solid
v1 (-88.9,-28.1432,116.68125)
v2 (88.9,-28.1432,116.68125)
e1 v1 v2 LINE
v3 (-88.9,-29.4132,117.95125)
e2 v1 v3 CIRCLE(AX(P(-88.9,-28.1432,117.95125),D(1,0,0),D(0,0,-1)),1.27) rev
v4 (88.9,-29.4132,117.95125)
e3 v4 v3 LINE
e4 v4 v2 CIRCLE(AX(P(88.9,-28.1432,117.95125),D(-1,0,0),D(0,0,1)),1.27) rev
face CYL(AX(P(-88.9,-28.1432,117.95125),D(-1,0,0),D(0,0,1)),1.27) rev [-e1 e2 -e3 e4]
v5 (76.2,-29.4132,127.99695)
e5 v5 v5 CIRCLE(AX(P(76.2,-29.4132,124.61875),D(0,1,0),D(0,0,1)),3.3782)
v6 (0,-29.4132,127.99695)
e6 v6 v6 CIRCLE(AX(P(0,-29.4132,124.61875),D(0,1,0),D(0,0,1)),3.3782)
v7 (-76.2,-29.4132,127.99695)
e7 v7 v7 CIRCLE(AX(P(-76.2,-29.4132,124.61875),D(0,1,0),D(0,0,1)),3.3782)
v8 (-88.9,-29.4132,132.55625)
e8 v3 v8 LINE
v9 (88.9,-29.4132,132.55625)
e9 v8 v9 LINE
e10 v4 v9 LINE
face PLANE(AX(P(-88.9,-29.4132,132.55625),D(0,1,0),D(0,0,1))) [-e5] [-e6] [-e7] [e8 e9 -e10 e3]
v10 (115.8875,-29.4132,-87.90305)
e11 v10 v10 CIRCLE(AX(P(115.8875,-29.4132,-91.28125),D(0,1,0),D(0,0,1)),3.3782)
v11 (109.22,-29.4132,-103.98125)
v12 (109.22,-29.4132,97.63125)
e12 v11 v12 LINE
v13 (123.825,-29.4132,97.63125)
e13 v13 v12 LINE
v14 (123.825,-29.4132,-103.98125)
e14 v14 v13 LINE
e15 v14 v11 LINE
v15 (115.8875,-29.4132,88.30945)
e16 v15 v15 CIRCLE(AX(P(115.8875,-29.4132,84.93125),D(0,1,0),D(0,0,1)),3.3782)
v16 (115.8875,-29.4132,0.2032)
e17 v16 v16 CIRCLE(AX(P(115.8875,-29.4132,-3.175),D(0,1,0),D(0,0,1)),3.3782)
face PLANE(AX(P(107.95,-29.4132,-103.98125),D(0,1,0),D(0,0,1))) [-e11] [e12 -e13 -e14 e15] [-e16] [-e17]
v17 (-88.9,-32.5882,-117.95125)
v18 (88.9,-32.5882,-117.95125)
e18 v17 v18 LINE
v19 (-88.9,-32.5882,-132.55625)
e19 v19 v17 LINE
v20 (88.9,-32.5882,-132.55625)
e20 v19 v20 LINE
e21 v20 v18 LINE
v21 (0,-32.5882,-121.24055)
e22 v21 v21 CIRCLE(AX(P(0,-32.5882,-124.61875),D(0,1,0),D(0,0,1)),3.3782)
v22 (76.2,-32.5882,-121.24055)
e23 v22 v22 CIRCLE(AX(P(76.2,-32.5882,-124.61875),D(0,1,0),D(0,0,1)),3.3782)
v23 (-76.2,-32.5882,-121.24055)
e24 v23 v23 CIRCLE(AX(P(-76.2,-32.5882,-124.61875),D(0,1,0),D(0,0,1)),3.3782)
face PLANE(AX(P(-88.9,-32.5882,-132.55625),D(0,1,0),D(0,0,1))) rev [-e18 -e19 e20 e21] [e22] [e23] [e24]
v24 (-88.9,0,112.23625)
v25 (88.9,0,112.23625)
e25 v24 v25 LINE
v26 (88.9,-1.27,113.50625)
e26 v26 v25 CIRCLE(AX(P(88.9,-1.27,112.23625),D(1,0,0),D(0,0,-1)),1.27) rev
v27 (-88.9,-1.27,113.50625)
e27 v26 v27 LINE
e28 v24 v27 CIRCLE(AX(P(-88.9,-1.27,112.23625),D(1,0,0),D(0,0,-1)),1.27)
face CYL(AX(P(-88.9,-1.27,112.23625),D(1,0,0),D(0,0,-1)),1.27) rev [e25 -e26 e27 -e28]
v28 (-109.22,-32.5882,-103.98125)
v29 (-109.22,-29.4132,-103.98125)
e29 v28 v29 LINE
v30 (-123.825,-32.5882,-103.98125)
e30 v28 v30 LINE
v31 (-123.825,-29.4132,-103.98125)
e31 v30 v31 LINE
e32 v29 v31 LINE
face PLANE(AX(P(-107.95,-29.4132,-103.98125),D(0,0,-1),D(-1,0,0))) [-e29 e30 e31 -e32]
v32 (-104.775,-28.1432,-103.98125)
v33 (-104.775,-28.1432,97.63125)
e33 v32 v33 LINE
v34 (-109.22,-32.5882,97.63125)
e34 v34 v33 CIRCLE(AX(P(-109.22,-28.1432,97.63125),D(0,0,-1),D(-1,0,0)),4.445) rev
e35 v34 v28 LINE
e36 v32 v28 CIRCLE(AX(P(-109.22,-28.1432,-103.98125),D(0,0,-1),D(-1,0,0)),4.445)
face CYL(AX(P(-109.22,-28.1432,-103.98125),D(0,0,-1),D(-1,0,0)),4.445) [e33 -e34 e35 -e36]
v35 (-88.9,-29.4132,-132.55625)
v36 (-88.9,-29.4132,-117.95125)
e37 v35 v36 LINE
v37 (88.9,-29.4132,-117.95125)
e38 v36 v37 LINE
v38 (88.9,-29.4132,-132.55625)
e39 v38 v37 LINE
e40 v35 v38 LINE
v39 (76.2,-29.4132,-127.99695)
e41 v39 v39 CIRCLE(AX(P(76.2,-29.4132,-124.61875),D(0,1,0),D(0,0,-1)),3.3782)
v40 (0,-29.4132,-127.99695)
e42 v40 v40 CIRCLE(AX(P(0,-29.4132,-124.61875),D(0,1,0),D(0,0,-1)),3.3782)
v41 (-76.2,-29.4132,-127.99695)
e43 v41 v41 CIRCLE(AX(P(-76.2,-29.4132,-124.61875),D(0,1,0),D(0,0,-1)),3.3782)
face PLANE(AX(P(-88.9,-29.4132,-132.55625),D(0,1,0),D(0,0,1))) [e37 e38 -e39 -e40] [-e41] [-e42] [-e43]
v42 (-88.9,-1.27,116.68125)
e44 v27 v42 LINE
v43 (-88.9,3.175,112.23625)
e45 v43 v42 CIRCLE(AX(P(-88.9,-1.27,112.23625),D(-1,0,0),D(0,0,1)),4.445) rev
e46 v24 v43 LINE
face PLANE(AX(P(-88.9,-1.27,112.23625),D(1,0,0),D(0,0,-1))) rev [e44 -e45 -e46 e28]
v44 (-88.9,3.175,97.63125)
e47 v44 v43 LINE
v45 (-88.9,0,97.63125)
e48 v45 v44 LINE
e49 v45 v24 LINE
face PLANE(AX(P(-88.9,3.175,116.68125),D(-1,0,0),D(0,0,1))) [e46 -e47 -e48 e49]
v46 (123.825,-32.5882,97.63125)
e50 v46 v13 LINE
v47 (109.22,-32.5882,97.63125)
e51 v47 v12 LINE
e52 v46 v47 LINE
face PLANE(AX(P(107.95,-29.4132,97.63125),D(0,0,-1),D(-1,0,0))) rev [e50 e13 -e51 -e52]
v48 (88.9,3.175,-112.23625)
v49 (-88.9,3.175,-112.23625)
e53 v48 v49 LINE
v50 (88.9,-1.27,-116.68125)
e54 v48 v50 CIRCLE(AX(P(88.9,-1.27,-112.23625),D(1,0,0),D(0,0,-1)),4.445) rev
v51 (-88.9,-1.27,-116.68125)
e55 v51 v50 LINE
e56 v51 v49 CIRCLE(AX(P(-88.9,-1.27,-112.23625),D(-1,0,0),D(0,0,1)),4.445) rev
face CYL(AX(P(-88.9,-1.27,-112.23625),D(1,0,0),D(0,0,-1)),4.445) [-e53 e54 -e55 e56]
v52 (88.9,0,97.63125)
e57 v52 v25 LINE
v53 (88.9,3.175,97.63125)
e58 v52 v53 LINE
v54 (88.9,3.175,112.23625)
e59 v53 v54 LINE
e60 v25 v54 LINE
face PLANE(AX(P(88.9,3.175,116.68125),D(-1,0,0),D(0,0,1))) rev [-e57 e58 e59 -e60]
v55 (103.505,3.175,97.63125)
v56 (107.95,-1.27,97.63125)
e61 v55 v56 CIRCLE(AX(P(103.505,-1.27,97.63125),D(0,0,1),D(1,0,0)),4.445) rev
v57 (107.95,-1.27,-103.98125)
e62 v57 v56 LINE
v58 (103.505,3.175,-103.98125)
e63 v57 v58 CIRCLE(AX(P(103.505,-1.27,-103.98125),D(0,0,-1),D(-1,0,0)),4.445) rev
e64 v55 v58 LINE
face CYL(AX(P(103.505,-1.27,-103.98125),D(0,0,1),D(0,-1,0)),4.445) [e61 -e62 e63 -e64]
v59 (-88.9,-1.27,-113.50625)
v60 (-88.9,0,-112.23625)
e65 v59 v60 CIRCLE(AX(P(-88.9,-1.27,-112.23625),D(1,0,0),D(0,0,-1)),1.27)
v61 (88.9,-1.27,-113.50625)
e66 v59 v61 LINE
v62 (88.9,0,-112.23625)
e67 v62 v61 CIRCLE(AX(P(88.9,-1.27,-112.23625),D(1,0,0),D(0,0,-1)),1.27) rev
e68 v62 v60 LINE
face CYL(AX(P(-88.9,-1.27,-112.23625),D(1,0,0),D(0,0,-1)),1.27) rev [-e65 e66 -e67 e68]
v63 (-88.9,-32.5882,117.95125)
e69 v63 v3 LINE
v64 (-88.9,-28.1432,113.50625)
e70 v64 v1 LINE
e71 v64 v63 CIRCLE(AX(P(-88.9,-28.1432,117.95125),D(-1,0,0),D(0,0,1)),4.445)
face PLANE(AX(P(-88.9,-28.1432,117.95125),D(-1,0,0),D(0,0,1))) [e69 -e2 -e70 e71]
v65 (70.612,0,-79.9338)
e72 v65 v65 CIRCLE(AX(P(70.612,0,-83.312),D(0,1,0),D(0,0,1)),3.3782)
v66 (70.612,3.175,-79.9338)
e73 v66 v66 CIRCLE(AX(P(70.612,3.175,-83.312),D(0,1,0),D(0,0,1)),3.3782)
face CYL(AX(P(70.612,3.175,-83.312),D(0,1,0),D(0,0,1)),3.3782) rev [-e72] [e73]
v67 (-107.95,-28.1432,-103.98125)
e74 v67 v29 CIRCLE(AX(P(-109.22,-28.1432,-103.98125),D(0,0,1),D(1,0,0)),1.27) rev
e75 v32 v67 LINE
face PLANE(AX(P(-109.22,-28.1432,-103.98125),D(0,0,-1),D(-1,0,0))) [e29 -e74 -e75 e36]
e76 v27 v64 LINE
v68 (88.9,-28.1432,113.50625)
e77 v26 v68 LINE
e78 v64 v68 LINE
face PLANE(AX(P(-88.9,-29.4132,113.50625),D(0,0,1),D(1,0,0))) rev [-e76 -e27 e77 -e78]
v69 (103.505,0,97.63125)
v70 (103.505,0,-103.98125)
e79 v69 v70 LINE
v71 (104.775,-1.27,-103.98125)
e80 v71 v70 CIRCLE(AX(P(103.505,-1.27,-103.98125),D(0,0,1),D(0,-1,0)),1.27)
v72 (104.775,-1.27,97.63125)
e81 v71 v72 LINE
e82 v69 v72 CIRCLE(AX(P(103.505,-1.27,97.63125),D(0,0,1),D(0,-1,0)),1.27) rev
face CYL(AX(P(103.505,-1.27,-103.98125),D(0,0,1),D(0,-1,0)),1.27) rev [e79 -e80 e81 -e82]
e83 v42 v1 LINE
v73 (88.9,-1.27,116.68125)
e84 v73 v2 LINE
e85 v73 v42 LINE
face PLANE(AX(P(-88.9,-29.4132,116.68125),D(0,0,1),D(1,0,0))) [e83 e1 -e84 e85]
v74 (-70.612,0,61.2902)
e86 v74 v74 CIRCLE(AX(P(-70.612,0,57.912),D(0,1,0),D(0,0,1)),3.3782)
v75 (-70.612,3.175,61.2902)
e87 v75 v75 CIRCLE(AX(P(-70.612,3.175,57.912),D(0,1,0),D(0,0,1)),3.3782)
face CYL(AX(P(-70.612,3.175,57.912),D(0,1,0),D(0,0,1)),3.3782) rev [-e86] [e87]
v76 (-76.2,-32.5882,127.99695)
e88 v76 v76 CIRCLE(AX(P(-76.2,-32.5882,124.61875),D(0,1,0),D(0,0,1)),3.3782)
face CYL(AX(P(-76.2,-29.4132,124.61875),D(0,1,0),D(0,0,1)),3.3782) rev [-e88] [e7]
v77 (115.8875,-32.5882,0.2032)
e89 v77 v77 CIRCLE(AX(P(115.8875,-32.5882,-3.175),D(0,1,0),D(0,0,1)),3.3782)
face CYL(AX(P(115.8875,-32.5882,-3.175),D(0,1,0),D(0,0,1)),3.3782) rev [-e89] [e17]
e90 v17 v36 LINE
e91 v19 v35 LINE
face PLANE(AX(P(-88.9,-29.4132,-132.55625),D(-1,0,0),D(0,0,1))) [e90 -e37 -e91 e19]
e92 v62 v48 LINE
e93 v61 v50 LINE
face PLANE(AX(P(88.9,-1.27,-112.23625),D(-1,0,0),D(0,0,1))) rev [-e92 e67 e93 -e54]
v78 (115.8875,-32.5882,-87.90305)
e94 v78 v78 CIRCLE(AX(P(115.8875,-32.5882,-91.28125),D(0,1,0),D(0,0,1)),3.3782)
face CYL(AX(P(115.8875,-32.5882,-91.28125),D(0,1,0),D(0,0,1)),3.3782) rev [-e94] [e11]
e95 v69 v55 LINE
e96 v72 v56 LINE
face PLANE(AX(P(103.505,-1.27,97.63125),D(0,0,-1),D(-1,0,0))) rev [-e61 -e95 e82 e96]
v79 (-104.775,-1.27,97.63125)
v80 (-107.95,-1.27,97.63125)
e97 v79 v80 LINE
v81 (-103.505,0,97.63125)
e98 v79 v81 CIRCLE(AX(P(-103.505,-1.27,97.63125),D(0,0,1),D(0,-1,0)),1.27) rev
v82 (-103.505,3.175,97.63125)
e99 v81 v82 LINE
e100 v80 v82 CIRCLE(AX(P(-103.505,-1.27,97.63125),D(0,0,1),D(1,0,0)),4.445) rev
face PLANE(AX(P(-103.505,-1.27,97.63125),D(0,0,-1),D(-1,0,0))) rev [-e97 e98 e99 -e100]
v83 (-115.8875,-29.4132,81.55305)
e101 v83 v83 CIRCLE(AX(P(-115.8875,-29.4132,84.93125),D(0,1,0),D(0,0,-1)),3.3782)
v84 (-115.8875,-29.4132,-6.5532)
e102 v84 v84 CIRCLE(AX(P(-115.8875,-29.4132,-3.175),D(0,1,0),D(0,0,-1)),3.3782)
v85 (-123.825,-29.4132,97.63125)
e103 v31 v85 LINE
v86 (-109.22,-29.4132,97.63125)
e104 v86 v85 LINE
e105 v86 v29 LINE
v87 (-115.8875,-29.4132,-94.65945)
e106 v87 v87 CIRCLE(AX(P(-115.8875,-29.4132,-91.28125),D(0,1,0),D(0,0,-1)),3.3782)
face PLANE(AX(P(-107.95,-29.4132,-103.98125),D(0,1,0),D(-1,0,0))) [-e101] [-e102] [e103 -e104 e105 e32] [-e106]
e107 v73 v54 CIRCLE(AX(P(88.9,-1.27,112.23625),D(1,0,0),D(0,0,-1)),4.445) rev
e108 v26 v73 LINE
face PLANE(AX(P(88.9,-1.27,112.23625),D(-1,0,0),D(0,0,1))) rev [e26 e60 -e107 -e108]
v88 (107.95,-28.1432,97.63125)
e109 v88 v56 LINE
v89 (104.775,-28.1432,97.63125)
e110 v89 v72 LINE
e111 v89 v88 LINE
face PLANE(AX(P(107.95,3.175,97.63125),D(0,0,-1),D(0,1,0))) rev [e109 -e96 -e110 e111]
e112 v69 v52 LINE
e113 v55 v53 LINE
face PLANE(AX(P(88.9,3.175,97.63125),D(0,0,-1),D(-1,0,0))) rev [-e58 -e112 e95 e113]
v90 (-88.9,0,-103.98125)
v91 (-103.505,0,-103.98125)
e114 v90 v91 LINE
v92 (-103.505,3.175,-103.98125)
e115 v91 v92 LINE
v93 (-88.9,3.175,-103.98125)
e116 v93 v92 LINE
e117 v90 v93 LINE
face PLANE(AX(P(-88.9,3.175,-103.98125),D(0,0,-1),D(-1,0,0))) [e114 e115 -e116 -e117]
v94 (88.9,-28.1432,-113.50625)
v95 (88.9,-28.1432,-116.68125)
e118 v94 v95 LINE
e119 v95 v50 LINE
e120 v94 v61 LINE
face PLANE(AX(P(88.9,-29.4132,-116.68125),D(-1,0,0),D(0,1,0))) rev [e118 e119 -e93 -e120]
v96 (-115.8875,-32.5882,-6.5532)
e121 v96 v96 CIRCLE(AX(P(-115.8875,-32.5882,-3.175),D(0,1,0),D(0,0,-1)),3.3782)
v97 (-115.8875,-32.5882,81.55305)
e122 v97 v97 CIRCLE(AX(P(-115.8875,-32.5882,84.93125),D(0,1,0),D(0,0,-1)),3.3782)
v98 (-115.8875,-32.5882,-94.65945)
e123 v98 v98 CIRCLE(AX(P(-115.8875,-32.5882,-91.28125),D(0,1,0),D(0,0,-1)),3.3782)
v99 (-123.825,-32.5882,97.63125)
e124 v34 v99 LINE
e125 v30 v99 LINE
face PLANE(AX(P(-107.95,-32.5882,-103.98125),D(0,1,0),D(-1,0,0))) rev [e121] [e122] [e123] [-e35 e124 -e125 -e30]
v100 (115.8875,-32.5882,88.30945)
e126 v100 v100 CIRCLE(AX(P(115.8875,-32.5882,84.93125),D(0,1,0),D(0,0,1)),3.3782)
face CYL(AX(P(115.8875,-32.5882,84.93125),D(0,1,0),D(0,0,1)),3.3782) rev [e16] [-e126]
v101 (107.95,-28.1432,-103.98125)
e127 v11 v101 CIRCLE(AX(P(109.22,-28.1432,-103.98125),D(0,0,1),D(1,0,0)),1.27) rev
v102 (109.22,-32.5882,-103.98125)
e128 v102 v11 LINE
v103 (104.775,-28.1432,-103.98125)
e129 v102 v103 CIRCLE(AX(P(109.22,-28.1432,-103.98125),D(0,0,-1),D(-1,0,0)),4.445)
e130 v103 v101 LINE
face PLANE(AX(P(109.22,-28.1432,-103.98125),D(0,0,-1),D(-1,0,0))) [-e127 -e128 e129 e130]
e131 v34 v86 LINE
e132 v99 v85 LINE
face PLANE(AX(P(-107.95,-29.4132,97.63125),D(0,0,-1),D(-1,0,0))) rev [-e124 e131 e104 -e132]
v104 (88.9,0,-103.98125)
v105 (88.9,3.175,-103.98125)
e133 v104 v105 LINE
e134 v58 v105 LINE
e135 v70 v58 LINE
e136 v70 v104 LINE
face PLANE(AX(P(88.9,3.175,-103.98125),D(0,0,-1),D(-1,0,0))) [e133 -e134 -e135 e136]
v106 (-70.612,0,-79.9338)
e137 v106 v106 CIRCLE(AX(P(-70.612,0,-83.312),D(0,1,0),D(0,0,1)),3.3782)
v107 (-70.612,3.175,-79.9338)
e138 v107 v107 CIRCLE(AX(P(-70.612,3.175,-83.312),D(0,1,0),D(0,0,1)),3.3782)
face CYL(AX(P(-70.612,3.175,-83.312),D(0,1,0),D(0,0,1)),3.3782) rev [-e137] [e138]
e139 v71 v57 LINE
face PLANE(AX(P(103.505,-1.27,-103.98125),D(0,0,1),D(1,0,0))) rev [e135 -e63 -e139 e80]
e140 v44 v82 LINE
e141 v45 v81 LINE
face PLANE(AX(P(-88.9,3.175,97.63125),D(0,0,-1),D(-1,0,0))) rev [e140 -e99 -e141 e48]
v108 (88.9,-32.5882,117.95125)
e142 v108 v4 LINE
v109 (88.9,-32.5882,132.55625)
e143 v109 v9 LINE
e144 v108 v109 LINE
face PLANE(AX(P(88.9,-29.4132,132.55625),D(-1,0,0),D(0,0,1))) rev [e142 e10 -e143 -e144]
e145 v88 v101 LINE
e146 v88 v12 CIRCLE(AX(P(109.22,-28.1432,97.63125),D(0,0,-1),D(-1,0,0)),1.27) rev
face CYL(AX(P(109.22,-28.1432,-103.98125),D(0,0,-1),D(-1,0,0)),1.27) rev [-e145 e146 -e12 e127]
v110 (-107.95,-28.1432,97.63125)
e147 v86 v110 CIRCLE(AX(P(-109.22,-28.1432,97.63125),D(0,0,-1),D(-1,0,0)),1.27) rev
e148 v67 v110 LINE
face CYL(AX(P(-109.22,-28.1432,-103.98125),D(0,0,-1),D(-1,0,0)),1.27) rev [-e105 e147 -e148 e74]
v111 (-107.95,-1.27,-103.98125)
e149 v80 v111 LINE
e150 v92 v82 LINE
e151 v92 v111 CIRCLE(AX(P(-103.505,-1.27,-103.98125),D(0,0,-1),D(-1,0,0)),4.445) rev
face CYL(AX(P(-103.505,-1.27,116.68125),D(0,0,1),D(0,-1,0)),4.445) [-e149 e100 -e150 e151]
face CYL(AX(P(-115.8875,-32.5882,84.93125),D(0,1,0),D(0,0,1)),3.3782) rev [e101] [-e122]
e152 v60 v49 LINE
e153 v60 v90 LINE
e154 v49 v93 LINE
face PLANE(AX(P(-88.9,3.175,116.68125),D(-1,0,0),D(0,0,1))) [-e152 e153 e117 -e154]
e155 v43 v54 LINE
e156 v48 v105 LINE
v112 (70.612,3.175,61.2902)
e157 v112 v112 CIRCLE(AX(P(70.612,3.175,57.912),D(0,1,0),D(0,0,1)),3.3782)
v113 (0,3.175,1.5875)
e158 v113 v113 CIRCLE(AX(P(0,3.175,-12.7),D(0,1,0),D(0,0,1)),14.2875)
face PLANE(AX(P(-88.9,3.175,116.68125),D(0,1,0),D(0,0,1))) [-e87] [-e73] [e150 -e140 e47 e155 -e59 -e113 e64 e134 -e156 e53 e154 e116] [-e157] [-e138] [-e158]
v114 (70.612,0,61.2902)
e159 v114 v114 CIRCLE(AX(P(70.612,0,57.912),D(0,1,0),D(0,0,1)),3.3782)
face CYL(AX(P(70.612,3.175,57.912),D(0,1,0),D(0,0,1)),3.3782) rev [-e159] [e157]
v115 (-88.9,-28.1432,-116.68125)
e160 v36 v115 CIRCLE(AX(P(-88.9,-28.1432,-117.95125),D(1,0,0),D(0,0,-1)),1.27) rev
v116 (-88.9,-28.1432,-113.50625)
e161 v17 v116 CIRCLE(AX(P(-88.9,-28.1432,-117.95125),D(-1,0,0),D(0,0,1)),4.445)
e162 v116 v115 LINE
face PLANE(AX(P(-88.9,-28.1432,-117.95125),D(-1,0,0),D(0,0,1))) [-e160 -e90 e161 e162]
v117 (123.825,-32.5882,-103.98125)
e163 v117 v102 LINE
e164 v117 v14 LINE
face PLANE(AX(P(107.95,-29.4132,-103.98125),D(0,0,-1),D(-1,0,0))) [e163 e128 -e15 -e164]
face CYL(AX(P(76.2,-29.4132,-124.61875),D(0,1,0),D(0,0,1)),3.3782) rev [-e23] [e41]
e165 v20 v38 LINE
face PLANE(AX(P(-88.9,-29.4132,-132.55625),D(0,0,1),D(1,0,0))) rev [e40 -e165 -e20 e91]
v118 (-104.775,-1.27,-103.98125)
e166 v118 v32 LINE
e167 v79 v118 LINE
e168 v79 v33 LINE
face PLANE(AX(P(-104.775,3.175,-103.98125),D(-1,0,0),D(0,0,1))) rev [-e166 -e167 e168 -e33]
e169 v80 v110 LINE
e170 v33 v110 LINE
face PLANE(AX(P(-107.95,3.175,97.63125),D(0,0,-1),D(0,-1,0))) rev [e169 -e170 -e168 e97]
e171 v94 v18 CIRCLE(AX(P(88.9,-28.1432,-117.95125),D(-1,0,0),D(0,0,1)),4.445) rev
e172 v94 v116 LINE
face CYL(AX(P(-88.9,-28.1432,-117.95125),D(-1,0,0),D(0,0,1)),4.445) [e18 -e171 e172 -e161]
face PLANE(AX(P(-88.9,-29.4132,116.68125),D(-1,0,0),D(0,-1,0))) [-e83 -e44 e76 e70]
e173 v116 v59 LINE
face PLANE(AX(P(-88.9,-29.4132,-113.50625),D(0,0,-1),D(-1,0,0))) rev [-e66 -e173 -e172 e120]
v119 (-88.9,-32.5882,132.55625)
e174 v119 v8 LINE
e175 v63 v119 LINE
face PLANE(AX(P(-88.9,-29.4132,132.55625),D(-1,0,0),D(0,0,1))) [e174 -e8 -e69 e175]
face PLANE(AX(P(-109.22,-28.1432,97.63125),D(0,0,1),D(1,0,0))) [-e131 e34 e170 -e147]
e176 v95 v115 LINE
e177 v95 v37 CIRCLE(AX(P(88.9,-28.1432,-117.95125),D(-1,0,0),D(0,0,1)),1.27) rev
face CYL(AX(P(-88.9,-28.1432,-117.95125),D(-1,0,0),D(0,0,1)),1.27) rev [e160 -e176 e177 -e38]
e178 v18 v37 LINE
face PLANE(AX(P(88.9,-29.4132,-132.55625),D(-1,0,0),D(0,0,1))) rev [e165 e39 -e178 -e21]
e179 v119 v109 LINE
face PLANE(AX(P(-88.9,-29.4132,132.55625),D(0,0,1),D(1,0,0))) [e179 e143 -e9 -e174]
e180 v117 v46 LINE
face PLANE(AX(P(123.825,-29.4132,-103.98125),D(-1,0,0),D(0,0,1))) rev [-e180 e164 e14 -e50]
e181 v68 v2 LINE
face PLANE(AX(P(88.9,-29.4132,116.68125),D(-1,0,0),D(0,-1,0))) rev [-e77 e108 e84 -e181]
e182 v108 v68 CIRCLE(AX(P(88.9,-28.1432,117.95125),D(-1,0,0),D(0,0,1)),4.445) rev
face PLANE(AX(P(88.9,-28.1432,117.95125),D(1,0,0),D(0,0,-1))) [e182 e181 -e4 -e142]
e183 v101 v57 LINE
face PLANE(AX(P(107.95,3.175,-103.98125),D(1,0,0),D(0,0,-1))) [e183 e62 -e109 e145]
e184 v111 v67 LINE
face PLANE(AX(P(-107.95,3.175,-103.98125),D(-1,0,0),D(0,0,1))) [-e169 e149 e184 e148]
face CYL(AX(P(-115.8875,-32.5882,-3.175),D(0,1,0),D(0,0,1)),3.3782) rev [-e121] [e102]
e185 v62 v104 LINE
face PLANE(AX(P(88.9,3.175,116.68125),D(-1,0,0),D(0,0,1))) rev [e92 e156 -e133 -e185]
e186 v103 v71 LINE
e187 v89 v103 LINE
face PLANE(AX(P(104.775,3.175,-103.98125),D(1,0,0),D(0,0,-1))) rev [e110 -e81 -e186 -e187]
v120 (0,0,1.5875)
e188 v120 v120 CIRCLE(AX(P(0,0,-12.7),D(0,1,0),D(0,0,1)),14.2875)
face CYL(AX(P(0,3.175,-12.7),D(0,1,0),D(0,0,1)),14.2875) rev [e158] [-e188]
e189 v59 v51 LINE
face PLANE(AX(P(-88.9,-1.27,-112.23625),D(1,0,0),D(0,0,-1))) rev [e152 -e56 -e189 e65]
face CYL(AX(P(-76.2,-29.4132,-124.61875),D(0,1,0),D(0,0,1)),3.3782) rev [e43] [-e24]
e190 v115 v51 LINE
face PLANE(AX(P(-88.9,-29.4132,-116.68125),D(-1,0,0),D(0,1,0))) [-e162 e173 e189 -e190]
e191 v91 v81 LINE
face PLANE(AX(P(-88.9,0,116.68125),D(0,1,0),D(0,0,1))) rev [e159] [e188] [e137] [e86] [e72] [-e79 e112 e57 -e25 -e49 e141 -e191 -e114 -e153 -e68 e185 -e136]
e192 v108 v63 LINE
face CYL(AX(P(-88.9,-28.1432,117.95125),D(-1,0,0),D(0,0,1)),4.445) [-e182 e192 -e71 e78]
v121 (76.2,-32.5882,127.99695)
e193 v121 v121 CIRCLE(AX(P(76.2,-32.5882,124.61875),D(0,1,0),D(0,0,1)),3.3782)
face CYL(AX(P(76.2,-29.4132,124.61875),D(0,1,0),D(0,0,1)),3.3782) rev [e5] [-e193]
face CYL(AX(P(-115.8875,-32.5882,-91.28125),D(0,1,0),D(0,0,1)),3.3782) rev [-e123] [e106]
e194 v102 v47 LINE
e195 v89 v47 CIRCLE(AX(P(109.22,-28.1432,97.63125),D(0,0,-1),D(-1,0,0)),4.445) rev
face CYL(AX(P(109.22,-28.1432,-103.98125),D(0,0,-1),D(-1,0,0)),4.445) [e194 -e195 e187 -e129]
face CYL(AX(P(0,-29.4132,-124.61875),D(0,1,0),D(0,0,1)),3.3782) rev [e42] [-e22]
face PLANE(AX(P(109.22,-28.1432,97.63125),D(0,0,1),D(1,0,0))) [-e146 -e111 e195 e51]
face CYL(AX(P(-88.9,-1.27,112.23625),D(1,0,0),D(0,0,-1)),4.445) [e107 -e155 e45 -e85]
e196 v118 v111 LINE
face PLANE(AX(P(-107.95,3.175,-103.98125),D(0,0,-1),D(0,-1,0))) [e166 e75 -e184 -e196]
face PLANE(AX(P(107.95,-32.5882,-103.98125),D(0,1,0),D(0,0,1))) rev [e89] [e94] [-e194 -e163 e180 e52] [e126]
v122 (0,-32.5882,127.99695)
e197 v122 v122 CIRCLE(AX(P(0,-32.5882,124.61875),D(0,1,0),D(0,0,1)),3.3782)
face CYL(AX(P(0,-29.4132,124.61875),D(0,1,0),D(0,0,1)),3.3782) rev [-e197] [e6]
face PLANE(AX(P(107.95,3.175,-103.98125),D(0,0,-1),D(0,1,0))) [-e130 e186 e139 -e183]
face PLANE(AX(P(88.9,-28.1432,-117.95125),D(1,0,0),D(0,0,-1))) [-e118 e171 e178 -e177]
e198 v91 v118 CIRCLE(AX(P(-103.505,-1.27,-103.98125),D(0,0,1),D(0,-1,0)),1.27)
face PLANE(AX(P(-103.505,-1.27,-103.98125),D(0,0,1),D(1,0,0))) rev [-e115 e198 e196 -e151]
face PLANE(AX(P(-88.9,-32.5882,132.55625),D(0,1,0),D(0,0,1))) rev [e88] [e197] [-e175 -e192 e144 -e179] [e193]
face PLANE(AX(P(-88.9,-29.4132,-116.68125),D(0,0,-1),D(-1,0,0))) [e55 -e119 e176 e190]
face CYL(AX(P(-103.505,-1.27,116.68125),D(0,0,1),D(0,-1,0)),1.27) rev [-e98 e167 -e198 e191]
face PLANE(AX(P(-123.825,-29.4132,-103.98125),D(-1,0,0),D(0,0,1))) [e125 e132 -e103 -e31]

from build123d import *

# Parameters (mm, degrees)
BOSS_EXTRUDE1_DEPTH      = 88.9
BOSS_EXTRUDE1_DEPTH_BACK = 88.9
SKETCH2_R                = 3.3782
CUT_EXTRUDE2_DEPTH       = 163.899847125
SKETCH5_R                = 14.2875
SKETCH5_R_2              = 3.3782
CUT_EXTRUDE3_DEPTH       = 164.564592404
BOSS_EXTRUDE3_START      = -19.05
BOSS_EXTRUDE3_DEPTH      = 201.6125
CONVERT_SOLID1_START     = -88.9
CONVERT_SOLID1_DEPTH     = 177.8
CONVERT_SOLID1_START_2   = -103.98125
CONVERT_SOLID1_2_DEPTH   = 201.6125
CONVERT_SOLID1_3_DEPTH   = 177.8
CONVERT_SOLID1_4_DEPTH   = 201.6125
SKETCH7_R                = 3.3782
CUT_EXTRUDE4_DEPTH       = 185.298076003


# Read off the part's stored shape, not the designer's step: Convert-Solid1
with BuildPart() as part:
    # Sketch1 → Boss-Extrude1 (new, two sides: drawn at the far end of the back side and taken through both)
    with BuildSketch(Plane(origin=(0, 0, 0), x_dir=(0, 0, -1), z_dir=(1, 0, 0)).offset(-BOSS_EXTRUDE1_DEPTH_BACK)):
        Polygon((-132.55625, -29.4132), (-132.55625, -32.5882), (-113.50625, -32.5882), (-113.50625, 0), (113.50625, 0), (113.50625, -32.5882), (132.55625, -32.5882), (132.55625, -29.4132), (116.68125, -29.4132), (116.68125, 3.175), (-116.68125, 3.175), (-116.68125, -29.4132), align=None)
    extrude(amount=BOSS_EXTRUDE1_DEPTH + BOSS_EXTRUDE1_DEPTH_BACK)

    # Sketch2 → Cut-Extrude2 (cut, through all)
    with BuildSketch(Plane(origin=(0, -29.4132, 0), x_dir=(1, 0, 0), z_dir=(0, 1, 0))):
        with Locations(Location((-76.2, -124.61875, 0), (0, 0, 270))):
            Circle(SKETCH2_R)
        with Locations(Location((0, -124.61875, 0), (0, 0, 270))):
            Circle(SKETCH2_R)
        with Locations(Location((76.2, -124.61875, 0), (0, 0, 270))):
            Circle(SKETCH2_R)
        with Locations(Location((76.2, 124.61875, 0), (0, 0, 90))):
            Circle(SKETCH2_R)
        with Locations(Location((0, 124.61875, 0), (0, 0, 90))):
            Circle(SKETCH2_R)
        with Locations(Location((-76.2, 124.61875, 0), (0, 0, 90))):
            Circle(SKETCH2_R)
    extrude(amount=-CUT_EXTRUDE2_DEPTH, mode=Mode.SUBTRACT)

    # Sketch5 → Cut-Extrude3 (cut, through all)
    with BuildSketch(Plane(origin=(0, 3.175, 0), x_dir=(1, 0, 0), z_dir=(0, 1, 0))):
        with Locations(Location((0, 12.7, 0), (0, 0, 270))):
            Circle(SKETCH5_R)
        with Locations(Location((-70.612, 83.312, 0), (0, 0, 270))):
            Circle(SKETCH5_R_2)
        with Locations(Location((70.612, 83.312, 0), (0, 0, 270))):
            Circle(SKETCH5_R_2)
        with Locations(Location((70.612, -57.912, 0), (0, 0, 270))):
            Circle(SKETCH5_R_2)
        with Locations(Location((-70.612, -57.912, 0), (0, 0, 270))):
            Circle(SKETCH5_R_2)
    extrude(amount=-CUT_EXTRUDE3_DEPTH, mode=Mode.SUBTRACT)

    # Sketch6 → Boss-Extrude3 (add)
    with BuildSketch(Plane.XY.offset(116.68125).offset(BOSS_EXTRUDE3_START)):
        Polygon((88.9, 3.175), (107.95, 3.175), (107.95, -29.4132), (123.825, -29.4132), (123.825, -32.5882), (104.775, -32.5882), (104.775, 0), (88.9, 0), align=None)
        Polygon((-88.9, 0), (-88.9, 3.175), (-107.95, 3.175), (-107.95, -29.4132), (-123.825, -29.4132), (-123.825, -32.5882), (-104.775, -32.5882), (-104.775, 0), align=None)
    extrude(amount=-BOSS_EXTRUDE3_DEPTH)

    # Convert-Solid1 outline → Convert-Solid1 (add)
    with BuildSketch(Plane.YZ.offset(CONVERT_SOLID1_START)):
        with BuildLine():
            Line((-29.4132, -116.68125), (-29.4132, -117.95125))
            ThreePointArc((-29.4132, -117.95125), (-29.041225612, -117.053224388), (-28.1432, -116.68125))
            Line((-28.1432, -116.68125), (-29.4132, -116.68125))
        make_face()
        with BuildLine():
            Line((0, -113.50625), (0, -112.23625))
            ThreePointArc((0, -112.23625), (-0.371974388, -113.134275612), (-1.27, -113.50625))
            Line((-1.27, -113.50625), (0, -113.50625))
        make_face()
        with BuildLine():
            ThreePointArc((-1.27, 113.50625), (-0.371974388, 113.134275612), (0, 112.23625))
            Line((0, 112.23625), (0, 113.50625))
            Line((0, 113.50625), (-1.27, 113.50625))
        make_face()
        with BuildLine():
            Line((-29.4132, 116.68125), (-28.1432, 116.68125))
            ThreePointArc((-28.1432, 116.68125), (-29.041225612, 117.053224388), (-29.4132, 117.95125))
            Line((-29.4132, 117.95125), (-29.4132, 116.68125))
        make_face()
    extrude(amount=CONVERT_SOLID1_DEPTH)

    # Convert-Solid1 2 outline → Convert-Solid1 2 (add)
    with BuildSketch(Plane.XY.offset(CONVERT_SOLID1_START_2)):
        with BuildLine():
            Line((107.95, -29.4132), (109.22, -29.4132))
            ThreePointArc((109.22, -29.4132), (108.321974388, -29.041225612), (107.95, -28.1432))
            Line((107.95, -28.1432), (107.95, -29.4132))
        make_face()
        with BuildLine():
            Line((-107.95, -29.4132), (-107.95, -28.1432))
            ThreePointArc((-107.95, -28.1432), (-108.321974388, -29.041225612), (-109.22, -29.4132))
            Line((-109.22, -29.4132), (-107.95, -29.4132))
        make_face()
        with BuildLine():
            ThreePointArc((-104.775, -1.27), (-104.403025612, -0.371974388), (-103.505, 0))
            Line((-103.505, 0), (-104.775, 0))
            Line((-104.775, 0), (-104.775, -1.27))
        make_face()
        with BuildLine():
            ThreePointArc((103.505, 0), (104.403025612, -0.371974388), (104.775, -1.27))
            Line((104.775, -1.27), (104.775, 0))
            Line((104.775, 0), (103.505, 0))
        make_face()
    extrude(amount=CONVERT_SOLID1_2_DEPTH)

    # Convert-Solid1 3 outline → Convert-Solid1 3 (cut)
    with BuildSketch(Plane.YZ.offset(CONVERT_SOLID1_START)):
        with BuildLine():
            ThreePointArc((-32.5882, -117.95125), (-31.286289642, -114.808160358), (-28.1432, -113.50625))
            Line((-28.1432, -113.50625), (-32.5882, -113.50625))
            Line((-32.5882, -113.50625), (-32.5882, -117.95125))
        make_face()
        with BuildLine():
            Line((-32.5882, 113.50625), (-28.1432, 113.50625))
            ThreePointArc((-28.1432, 113.50625), (-31.286289642, 114.808160358), (-32.5882, 117.95125))
            Line((-32.5882, 117.95125), (-32.5882, 113.50625))
        make_face()
        with BuildLine():
            ThreePointArc((-1.27, 116.68125), (1.873089642, 115.379339642), (3.175, 112.23625))
            Line((3.175, 112.23625), (3.175, 116.68125))
            Line((3.175, 116.68125), (-1.27, 116.68125))
        make_face()
        with BuildLine():
            ThreePointArc((3.175, -112.23625), (1.873089642, -115.379339642), (-1.27, -116.68125))
            Line((-1.27, -116.68125), (3.175, -116.68125))
            Line((3.175, -116.68125), (3.175, -112.23625))
        make_face()
    extrude(amount=CONVERT_SOLID1_3_DEPTH, mode=Mode.SUBTRACT)

    # Convert-Solid1 4 outline → Convert-Solid1 4 (cut)
    with BuildSketch(Plane.XY.offset(CONVERT_SOLID1_START_2)):
        with BuildLine():
            ThreePointArc((-107.95, -1.27), (-106.648089642, 1.873089642), (-103.505, 3.175))
            Line((-103.505, 3.175), (-107.95, 3.175))
            Line((-107.95, 3.175), (-107.95, -1.27))
        make_face()
        with BuildLine():
            ThreePointArc((103.505, 3.175), (106.648089642, 1.873089642), (107.95, -1.27))
            Line((107.95, -1.27), (107.95, 3.175))
            Line((107.95, 3.175), (103.505, 3.175))
        make_face()
        with BuildLine():
            Line((104.775, -32.5882), (109.22, -32.5882))
            ThreePointArc((109.22, -32.5882), (106.076910358, -31.286289642), (104.775, -28.1432))
            Line((104.775, -28.1432), (104.775, -32.5882))
        make_face()
        with BuildLine():
            Line((-104.775, -32.5882), (-104.775, -28.1432))
            ThreePointArc((-104.775, -28.1432), (-106.076910358, -31.286289642), (-109.22, -32.5882))
            Line((-109.22, -32.5882), (-104.775, -32.5882))
        make_face()
    extrude(amount=CONVERT_SOLID1_4_DEPTH, mode=Mode.SUBTRACT)

    # Sketch7 → Cut-Extrude4 (cut, through all)
    with BuildSketch(Plane(origin=(0, -29.4132, 0), x_dir=(1, 0, 0), z_dir=(0, 1, 0))):
        with Locations(Location((115.8875, -84.93125, 0), (0, 0, 270))):
            Circle(SKETCH7_R)
        with Locations(Location((115.8875, 3.175, 0), (0, 0, 270))):
            Circle(SKETCH7_R)
        with Locations(Location((115.8875, 91.28125, 0), (0, 0, 270))):
            Circle(SKETCH7_R)
        with Locations(Location((-115.8875, -84.93125, 0), (0, 0, 90))):
            Circle(SKETCH7_R)
        with Locations(Location((-115.8875, 3.175, 0), (0, 0, 90))):
            Circle(SKETCH7_R)
        with Locations(Location((-115.8875, 91.28125, 0), (0, 0, 90))):
            Circle(SKETCH7_R)
    extrude(amount=-CUT_EXTRUDE4_DEPTH, mode=Mode.SUBTRACT)


solid = part.part
